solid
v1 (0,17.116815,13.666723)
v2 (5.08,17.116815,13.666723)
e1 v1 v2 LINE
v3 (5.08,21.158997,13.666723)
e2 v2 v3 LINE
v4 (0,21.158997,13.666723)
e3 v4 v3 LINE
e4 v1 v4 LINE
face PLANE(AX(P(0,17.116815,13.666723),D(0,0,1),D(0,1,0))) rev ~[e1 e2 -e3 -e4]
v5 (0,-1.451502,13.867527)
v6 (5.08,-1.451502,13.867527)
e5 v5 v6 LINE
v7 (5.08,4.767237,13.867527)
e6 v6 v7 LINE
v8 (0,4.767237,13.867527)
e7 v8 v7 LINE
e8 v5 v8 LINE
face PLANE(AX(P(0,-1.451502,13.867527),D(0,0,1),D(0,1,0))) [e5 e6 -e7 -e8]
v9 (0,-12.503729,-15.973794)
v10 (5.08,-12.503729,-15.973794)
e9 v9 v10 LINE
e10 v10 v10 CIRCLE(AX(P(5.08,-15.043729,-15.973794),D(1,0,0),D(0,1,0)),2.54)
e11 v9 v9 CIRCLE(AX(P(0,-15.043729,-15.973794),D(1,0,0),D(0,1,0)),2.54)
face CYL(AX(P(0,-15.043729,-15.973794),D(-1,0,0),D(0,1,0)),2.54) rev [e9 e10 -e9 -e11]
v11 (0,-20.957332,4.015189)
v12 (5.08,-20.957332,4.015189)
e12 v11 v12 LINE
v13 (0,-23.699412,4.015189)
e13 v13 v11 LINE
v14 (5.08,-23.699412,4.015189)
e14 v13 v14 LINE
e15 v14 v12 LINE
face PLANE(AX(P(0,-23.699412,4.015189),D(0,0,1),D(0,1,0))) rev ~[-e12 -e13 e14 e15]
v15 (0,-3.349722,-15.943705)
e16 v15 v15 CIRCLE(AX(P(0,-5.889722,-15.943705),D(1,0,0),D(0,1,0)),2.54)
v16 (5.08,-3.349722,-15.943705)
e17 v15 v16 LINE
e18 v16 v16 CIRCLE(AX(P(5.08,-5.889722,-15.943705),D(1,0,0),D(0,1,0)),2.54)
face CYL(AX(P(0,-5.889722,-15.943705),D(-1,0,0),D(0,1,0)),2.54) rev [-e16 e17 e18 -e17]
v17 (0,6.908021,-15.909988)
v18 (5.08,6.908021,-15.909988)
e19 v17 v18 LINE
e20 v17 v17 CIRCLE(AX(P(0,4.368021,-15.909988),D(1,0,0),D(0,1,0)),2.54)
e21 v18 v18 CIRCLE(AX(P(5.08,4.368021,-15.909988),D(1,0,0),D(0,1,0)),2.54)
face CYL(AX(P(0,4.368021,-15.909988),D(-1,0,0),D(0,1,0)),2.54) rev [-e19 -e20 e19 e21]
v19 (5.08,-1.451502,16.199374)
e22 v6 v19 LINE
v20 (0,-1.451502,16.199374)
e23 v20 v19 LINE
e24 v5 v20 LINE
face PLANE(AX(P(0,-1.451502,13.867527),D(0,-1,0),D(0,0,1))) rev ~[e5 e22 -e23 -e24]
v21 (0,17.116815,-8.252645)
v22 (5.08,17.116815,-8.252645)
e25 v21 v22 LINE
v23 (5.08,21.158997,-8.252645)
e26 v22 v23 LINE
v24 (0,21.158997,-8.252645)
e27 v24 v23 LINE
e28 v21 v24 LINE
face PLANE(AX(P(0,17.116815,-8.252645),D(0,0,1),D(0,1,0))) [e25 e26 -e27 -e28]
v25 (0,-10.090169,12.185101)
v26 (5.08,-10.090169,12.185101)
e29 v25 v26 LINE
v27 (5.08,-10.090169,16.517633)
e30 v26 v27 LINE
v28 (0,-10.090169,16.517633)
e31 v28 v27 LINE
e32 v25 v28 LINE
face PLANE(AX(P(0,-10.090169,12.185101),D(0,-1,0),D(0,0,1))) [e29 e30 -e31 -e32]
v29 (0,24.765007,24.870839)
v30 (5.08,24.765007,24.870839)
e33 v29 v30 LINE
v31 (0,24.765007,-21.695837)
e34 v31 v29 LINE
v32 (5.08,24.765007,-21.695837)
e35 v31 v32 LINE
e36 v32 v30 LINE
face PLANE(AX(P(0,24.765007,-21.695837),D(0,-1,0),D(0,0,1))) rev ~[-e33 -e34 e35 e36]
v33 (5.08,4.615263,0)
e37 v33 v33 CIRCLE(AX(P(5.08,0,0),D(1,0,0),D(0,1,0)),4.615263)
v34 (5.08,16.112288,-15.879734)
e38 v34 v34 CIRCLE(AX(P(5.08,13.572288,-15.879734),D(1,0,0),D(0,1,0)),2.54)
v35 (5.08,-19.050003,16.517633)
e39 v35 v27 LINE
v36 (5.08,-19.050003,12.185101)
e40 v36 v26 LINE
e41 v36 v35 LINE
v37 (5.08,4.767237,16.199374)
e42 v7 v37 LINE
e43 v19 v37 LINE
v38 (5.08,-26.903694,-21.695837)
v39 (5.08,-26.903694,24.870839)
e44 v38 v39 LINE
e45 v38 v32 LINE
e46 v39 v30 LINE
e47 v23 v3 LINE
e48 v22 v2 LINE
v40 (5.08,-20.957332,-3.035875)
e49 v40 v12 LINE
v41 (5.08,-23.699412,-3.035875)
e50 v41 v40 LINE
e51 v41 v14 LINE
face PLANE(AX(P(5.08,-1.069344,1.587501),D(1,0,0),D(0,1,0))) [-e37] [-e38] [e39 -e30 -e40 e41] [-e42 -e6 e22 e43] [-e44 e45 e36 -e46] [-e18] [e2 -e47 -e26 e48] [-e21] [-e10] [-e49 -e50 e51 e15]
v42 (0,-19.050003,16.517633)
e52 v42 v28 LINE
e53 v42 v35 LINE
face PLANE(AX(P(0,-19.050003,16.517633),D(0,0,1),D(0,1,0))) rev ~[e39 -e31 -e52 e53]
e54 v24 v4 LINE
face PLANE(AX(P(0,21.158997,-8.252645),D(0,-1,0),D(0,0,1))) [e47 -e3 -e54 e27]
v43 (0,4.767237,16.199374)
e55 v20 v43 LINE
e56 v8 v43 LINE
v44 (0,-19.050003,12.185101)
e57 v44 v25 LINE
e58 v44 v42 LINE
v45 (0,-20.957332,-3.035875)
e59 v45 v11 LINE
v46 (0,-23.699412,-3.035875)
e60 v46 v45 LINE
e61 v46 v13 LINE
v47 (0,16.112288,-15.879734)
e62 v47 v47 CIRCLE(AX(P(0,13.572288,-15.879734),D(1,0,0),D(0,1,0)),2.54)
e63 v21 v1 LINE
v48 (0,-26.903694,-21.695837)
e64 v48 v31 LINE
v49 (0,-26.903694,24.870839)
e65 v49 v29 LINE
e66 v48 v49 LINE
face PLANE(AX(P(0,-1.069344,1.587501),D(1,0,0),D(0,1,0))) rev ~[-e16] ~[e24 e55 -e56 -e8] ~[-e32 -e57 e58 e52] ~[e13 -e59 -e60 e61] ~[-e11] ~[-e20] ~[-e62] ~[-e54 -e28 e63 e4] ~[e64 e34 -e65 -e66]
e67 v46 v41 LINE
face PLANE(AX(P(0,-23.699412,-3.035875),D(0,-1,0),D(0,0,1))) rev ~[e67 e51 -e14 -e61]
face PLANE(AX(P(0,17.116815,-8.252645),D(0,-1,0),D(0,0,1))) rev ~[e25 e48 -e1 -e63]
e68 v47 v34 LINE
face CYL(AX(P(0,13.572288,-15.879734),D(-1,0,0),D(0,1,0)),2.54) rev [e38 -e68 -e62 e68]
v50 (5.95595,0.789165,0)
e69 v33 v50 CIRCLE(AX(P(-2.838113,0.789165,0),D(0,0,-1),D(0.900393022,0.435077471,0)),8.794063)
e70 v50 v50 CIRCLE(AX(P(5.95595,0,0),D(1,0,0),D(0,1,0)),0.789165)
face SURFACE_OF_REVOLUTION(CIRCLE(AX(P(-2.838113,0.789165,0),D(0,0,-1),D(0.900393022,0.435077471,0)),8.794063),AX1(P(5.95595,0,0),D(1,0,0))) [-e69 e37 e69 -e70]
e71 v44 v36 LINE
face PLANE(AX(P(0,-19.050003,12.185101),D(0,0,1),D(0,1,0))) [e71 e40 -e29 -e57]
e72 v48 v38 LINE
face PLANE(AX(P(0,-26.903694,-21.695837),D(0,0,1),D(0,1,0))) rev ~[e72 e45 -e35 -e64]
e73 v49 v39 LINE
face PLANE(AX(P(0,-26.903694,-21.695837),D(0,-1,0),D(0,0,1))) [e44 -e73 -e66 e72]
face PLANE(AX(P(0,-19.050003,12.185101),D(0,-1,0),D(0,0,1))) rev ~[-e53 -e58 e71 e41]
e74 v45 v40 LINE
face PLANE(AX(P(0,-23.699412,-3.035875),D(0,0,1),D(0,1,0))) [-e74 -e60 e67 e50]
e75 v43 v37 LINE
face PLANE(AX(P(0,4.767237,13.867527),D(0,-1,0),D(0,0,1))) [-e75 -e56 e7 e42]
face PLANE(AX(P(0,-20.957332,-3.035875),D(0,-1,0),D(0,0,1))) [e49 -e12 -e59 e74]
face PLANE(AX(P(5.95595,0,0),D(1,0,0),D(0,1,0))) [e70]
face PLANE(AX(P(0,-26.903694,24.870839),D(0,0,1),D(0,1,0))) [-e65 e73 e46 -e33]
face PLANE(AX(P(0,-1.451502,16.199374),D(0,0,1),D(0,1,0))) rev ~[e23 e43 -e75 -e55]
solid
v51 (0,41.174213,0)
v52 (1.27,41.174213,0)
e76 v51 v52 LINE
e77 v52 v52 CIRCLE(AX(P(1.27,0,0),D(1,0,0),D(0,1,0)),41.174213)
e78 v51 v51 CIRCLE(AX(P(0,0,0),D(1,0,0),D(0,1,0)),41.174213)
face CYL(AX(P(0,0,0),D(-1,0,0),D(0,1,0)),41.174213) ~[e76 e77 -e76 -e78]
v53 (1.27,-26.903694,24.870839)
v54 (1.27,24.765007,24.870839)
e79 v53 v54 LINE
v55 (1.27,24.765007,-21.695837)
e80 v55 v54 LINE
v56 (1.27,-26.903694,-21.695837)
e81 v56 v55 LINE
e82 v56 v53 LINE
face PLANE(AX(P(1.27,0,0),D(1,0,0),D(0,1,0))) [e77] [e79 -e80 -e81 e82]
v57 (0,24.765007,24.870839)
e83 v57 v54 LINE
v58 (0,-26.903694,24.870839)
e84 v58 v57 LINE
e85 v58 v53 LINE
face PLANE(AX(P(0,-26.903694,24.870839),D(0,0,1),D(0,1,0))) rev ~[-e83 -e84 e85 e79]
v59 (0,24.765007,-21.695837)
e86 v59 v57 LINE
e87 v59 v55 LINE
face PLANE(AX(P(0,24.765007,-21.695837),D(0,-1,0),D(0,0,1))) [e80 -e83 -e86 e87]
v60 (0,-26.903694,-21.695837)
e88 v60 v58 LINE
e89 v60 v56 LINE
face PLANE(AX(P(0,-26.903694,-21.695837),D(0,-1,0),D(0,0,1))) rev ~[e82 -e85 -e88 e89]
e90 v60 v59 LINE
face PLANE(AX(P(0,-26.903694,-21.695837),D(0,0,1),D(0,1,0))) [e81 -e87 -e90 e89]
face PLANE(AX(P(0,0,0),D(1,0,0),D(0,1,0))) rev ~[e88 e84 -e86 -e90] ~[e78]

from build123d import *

# Parameters (mm, degrees)
F0_W      = 51.6687010021
F0_H      = 46.5666760604
F0_R      = 2.54
F0_W_2    = 2.7420800179
F0_H_2    = 7.0510646328
F0_W_3    = 8.9598344539
F0_H_3    = 4.3325314605
F0_R_2    = 4.6152632683
F0_W_4    = 4.0421821177
F0_H_4    = 21.9193678349
F0_W_5    = 6.2187388539
F0_H_5    = 2.331847325
F7_DEPTH  = 5.08
F8_DEPTH  = 5.95595
F0_R_3    = 41.1742131812
F10_DEPTH = 1.27


# Not quite as in the source:
# - a fillet or chamfer that OpenCascade refuses, or shapes differently, is made with other operations: its cross-section is extruded or revolved along the edge and cut away or added
# - the program builds the solid bodies; features that only make, move or delete a surface that nothing else refers to are left out


with BuildPart() as f7:
    # F0 (on Right) → F7 (new body)
    with BuildSketch(Plane.YZ):
        with Locations((-1.069343959, 1.5875007549)):
            Rectangle(F0_W, F0_H)
        with Locations((-15.0437285019, -15.973794371)):
            Circle(F0_R, mode=Mode.SUBTRACT)
        with Locations((-5.8897222223, -15.9437051803)):
            Circle(F0_R, mode=Mode.SUBTRACT)
        with Locations((4.3680206165, -15.9099880108)):
            Circle(F0_R, mode=Mode.SUBTRACT)
        with Locations((13.5722881269, -15.8797336116)):
            Circle(F0_R, mode=Mode.SUBTRACT)
        with Locations((-22.3283721134, 0.4896570463)):
            Rectangle(F0_W_2, F0_H_2, mode=Mode.SUBTRACT)
        with Locations((-14.5700857925, 14.3513671276)):
            Rectangle(F0_W_3, F0_H_3, mode=Mode.SUBTRACT)
        Circle(F0_R_2, mode=Mode.SUBTRACT)
        with Locations((19.1379059106, 2.7070390061)):
            Rectangle(F0_W_4, F0_H_4, mode=Mode.SUBTRACT)
        with Locations((1.6578678042, 15.0334504433)):
            Rectangle(F0_W_5, F0_H_5, mode=Mode.SUBTRACT)
    extrude(amount=F7_DEPTH)

    # F0 (on Right) → F8 (join)
    with BuildSketch(Plane.YZ):
        Circle(F0_R_2)
    extrude(amount=F8_DEPTH)

    # F9: fillet of radius 8.7940626066 on 1 edges, made by hand

    # F9_s1 → F9_t2 (revolve, cut)
    with BuildSketch(Plane.XY):
        with BuildLine():
            ThreePointArc((5.08, 4.6152632683), (5.7341658279, 2.7517089067), (5.95595, 0.7891647492))
            Line((5.95595, 0.7891647492), (5.95595, 4.6152632683))
            Line((5.95595, 4.6152632683), (5.08, 4.6152632683))
        make_face()
    revolve(axis=Axis((5.95595, 0, 0), (1, 0, 0)), mode=Mode.SUBTRACT)


with BuildPart() as f10:
    # F0 (on Right) → F10 (new body)
    with BuildSketch(Plane.YZ):
        Circle(F0_R_3)
        with Locations((-1.069343959, 1.5875007549)):
            Rectangle(F0_W, F0_H, mode=Mode.SUBTRACT)
    extrude(amount=F10_DEPTH)


solid = Compound([f7.part, f10.part])
